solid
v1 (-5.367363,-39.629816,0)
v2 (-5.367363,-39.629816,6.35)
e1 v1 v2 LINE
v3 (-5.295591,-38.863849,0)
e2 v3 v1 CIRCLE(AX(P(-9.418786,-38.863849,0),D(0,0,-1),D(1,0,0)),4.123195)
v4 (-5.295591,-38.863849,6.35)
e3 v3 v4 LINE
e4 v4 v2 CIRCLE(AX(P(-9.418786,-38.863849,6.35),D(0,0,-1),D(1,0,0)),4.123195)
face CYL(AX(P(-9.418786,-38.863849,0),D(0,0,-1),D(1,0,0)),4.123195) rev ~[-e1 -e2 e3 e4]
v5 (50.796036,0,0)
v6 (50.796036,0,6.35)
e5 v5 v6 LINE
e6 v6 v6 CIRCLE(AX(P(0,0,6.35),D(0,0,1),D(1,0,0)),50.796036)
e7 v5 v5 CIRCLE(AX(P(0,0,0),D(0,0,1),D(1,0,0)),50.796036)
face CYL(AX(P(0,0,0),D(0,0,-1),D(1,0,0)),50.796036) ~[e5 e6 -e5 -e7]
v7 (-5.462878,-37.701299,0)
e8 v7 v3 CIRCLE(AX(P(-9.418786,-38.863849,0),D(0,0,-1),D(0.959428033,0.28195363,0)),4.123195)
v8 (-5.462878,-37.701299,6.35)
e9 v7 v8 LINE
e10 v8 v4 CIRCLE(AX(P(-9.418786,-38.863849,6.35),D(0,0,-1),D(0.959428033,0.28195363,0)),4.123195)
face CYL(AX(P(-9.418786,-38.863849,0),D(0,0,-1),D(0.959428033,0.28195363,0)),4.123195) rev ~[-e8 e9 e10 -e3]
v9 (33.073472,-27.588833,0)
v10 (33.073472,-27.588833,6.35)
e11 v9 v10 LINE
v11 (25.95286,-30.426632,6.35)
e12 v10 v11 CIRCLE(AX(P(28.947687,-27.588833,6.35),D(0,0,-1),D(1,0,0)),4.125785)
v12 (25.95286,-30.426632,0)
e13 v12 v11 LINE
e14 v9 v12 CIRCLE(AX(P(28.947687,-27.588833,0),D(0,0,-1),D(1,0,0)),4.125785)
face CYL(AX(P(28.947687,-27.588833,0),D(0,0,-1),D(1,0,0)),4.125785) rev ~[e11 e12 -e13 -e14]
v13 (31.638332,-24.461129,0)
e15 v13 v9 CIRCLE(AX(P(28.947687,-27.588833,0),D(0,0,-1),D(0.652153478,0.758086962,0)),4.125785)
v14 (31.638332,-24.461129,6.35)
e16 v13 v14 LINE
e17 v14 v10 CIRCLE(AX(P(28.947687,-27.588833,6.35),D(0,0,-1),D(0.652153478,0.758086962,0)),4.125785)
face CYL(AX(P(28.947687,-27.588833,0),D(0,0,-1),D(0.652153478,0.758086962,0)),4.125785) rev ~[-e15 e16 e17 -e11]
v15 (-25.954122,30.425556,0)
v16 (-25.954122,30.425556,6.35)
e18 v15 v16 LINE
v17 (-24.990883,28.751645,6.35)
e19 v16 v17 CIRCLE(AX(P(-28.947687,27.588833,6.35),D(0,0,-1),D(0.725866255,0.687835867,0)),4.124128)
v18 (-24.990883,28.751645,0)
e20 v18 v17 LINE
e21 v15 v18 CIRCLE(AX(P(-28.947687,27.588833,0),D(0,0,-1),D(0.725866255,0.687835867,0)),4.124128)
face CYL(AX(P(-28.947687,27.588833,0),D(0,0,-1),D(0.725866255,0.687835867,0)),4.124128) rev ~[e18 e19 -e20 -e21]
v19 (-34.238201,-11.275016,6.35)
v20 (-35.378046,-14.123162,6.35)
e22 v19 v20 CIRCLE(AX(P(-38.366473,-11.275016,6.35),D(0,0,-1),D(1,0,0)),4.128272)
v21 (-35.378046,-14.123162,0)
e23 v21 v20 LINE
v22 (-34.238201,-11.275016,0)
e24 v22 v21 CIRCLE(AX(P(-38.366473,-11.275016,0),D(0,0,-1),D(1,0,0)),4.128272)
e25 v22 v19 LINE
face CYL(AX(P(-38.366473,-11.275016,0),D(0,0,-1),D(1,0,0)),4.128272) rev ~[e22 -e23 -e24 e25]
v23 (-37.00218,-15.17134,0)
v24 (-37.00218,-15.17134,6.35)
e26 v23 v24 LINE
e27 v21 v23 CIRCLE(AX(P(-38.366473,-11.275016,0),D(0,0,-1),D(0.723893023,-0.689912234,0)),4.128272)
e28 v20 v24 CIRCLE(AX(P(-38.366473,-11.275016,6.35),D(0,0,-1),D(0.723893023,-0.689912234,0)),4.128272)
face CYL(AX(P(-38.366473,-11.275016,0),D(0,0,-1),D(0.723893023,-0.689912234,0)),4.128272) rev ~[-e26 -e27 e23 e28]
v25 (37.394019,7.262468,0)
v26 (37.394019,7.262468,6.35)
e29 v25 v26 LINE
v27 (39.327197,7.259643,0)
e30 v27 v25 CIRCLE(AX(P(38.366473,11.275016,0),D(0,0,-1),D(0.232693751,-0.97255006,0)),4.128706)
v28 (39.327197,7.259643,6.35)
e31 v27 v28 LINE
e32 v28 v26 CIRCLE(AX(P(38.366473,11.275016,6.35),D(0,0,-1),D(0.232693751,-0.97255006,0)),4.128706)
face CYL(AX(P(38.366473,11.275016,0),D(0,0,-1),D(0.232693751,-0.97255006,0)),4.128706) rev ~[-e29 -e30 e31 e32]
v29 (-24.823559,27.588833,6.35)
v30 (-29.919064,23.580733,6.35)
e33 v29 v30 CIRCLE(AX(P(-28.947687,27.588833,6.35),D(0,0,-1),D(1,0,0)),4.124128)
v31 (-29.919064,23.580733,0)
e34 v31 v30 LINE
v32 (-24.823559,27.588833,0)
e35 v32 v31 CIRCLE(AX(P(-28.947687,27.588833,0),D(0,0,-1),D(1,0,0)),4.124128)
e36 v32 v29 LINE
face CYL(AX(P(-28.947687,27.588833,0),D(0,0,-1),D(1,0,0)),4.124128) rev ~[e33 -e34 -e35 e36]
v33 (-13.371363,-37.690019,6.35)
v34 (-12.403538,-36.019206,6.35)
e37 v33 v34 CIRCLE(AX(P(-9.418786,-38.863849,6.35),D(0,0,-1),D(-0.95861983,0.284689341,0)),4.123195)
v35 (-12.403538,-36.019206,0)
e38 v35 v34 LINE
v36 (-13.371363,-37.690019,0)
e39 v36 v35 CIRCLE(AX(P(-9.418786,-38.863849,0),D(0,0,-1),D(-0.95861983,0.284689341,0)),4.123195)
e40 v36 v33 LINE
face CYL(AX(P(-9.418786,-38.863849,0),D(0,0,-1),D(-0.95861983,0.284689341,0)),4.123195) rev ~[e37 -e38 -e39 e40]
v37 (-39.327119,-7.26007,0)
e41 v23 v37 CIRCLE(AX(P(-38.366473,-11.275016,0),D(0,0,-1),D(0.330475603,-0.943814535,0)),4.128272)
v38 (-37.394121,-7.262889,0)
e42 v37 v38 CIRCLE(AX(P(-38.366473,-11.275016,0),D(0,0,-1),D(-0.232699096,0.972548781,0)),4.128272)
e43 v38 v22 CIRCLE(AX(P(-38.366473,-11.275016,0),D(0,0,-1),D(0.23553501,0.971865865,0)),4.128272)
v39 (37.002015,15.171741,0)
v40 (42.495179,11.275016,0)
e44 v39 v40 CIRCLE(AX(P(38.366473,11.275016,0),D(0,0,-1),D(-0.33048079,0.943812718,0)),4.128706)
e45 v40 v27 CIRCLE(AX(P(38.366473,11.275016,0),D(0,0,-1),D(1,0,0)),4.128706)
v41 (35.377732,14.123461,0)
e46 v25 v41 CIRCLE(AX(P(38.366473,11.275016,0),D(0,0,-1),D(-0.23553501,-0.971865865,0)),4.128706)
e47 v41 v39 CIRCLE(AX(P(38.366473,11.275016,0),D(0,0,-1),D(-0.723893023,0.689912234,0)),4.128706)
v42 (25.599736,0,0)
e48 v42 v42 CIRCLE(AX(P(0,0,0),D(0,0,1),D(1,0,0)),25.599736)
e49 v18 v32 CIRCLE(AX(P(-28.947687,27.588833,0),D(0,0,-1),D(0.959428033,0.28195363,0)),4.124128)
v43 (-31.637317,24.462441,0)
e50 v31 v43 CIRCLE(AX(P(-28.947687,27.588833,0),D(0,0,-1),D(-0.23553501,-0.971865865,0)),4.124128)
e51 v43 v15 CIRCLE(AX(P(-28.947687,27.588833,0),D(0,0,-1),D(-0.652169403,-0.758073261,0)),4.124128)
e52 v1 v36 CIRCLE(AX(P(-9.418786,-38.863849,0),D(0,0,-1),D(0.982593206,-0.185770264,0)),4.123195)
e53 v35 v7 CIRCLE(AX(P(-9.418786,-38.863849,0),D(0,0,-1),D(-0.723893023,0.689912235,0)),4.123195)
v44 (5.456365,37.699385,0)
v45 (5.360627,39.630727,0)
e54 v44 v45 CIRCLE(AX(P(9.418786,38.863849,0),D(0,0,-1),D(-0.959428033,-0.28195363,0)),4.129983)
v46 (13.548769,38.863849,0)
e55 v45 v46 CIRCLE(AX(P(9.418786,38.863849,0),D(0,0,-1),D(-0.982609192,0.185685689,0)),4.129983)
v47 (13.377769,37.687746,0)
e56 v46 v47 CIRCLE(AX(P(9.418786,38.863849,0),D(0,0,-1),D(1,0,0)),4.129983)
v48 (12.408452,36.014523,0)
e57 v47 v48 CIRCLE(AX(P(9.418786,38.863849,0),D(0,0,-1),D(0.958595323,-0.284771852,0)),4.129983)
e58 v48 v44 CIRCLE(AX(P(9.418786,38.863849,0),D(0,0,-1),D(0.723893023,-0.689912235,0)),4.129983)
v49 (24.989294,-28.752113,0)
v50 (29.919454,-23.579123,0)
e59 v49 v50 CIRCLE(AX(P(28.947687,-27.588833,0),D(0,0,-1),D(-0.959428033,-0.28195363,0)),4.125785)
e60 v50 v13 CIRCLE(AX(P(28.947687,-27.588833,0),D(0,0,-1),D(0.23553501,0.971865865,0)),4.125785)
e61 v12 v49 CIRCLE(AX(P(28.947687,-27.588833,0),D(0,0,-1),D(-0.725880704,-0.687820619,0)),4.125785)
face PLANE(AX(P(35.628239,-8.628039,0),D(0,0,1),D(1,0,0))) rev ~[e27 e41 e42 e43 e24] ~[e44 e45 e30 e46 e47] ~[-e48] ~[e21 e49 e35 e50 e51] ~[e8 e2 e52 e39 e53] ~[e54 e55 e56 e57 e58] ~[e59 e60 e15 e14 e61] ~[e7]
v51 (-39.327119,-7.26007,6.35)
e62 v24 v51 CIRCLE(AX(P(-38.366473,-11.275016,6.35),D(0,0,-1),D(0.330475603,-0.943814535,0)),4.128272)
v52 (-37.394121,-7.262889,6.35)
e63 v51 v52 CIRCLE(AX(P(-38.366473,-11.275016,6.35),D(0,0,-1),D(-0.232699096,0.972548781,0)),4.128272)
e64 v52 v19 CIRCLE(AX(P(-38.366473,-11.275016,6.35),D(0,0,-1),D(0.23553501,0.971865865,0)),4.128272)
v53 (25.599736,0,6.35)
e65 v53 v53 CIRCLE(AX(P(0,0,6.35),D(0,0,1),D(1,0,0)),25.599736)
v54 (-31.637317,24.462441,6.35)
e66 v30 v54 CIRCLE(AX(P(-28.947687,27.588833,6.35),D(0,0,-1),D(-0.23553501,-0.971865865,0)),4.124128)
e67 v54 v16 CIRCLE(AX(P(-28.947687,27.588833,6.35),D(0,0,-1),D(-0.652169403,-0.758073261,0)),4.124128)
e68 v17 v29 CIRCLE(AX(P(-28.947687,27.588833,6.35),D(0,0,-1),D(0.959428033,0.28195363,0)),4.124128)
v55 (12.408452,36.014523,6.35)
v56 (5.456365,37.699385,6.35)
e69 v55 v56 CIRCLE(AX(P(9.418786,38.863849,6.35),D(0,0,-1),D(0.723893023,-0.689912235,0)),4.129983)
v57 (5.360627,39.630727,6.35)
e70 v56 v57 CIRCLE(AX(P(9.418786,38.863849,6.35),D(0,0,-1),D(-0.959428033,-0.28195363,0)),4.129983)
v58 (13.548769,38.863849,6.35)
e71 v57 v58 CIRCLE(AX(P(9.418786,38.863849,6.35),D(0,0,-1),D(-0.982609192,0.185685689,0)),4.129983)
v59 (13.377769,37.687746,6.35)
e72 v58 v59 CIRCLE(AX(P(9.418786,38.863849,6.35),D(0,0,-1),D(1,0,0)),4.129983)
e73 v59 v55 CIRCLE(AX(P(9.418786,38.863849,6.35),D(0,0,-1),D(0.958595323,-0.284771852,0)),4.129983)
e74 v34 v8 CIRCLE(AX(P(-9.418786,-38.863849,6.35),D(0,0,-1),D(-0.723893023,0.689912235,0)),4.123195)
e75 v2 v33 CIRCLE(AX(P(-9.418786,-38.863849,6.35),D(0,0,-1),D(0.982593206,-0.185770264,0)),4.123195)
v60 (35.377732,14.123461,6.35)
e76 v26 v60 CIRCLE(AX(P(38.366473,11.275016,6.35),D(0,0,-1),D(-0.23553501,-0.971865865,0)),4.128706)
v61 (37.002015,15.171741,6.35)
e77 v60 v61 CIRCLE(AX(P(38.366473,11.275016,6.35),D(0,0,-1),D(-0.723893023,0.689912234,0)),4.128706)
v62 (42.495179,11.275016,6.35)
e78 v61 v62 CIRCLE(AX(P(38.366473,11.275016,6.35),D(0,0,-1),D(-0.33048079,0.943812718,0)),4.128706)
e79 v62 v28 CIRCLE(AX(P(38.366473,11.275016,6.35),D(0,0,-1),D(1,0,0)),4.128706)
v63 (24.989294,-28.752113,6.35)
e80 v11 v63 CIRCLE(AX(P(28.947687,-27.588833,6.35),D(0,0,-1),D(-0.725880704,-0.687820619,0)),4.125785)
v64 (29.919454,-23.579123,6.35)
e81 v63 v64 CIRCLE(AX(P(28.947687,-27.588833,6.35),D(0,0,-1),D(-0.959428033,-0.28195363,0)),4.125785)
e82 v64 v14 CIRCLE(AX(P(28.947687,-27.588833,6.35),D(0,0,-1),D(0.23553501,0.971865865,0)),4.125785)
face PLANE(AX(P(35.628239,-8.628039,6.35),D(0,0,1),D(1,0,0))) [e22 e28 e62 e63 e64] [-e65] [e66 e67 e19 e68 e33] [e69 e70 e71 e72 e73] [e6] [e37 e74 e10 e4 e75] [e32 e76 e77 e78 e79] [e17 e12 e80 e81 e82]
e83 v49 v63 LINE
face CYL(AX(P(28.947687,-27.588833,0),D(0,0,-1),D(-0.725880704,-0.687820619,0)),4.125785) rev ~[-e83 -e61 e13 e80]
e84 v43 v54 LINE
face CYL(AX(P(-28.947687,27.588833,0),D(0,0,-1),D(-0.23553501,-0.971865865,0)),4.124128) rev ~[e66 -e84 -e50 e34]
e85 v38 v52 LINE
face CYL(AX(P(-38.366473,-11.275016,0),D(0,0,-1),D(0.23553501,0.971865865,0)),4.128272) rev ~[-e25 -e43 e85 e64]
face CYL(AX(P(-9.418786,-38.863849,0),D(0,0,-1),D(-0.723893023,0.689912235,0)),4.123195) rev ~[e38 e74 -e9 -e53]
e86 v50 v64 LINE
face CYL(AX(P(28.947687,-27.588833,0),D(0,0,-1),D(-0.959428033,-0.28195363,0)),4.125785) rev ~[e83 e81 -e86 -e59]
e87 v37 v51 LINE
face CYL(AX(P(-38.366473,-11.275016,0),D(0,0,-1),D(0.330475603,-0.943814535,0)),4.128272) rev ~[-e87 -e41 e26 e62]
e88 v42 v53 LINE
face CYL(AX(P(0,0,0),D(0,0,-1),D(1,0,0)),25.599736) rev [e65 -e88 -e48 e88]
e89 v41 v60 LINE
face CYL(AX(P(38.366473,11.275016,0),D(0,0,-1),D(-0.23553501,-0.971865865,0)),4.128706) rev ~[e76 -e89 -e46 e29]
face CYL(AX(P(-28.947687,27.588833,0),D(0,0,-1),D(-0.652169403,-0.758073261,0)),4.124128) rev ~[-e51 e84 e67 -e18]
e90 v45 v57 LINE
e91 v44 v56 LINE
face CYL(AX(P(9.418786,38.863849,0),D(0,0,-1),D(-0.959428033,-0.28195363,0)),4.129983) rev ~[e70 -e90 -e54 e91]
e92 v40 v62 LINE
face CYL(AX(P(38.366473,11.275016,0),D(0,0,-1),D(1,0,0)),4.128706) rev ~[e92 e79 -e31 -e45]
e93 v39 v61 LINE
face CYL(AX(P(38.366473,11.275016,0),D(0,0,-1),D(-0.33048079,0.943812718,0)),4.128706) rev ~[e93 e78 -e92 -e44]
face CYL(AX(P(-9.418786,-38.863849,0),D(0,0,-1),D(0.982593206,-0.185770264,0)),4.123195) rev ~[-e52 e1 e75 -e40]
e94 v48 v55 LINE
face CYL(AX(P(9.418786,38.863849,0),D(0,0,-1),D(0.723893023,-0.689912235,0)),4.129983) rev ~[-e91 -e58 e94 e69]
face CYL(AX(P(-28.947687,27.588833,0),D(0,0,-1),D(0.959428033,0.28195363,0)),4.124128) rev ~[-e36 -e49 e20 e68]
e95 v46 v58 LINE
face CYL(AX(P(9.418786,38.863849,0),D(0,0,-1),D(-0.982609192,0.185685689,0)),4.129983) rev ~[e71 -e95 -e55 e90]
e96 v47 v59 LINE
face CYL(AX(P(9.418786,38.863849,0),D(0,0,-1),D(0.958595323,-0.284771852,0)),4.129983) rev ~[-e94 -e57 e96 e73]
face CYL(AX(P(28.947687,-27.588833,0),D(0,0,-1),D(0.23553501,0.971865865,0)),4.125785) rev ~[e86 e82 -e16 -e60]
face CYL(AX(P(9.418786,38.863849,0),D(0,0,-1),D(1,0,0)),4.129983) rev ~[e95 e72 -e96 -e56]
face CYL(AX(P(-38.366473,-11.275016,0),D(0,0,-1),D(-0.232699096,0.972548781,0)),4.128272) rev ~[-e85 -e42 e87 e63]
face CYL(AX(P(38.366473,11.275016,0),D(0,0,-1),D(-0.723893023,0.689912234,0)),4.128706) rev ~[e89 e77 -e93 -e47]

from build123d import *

# Parameters (mm, degrees)
F0_R     = 50.796035682
F1_DEPTH = 6.35
F0_R_2   = 25.5997355282
F2_DEPTH = 6.35


with BuildPart() as f1:
    # F0 (on Top) → F1 (new body)
    with BuildSketch(Plane.XY):
        Circle(F0_R)
        with BuildLine():
            ThreePointArc((39.3271974597, 7.2596428653), (39.8251792413, 3.6449928619), (39.9916350574, 0))
            ThreePointArc((39.9916350574, 0), (37.8457361774, -12.9240522963), (31.638331797, -24.4611290759))
            ThreePointArc((31.638331797, -24.4611290759), (32.6975616463, -25.8682109338), (33.0734716269, -27.5888325992))
            ThreePointArc((33.0734716269, -27.5888325992), (30.4751171589, -31.421463006), (25.9528595707, -30.4266323255))
            ThreePointArc((25.9528595707, -30.4266323255), (11.2745427029, -38.3694613124), (-5.3673629967, -39.6298156572))
            ThreePointArc((-5.3673629967, -39.6298156572), (-10.3899431598, -42.8710411012), (-13.3713628706, -37.6900189645))
            ThreePointArc((-13.3713628706, -37.6900189645), (-27.5888779577, -28.9514194402), (-37.0021800615, -15.1713396))
            ThreePointArc((-37.0021800615, -15.1713396), (-42.3272537393, -12.438997445), (-39.3271186708, -7.2600696702))
            ThreePointArc((-39.3271186708, -7.2600696702), (-38.8660161768, 9.4214468691), (-31.637317072, 24.4624414777))
            ThreePointArc((-31.637317072, 24.4624414777), (-31.9331144569, 30.4341189249), (-25.9541217074, 30.4255557215))
            ThreePointArc((-25.9541217074, 30.4255557215), (-11.2785991848, 38.3682691165), (5.3606272578, 39.6307273459))
            ThreePointArc((5.3606272578, 39.6307273459), (9.8039037737, 42.9758363595), (13.548769251, 38.8638486327))
            ThreePointArc((13.548769251, 38.8638486327), (13.5057955215, 38.2696140057), (13.3777686423, 37.6877457633))
            ThreePointArc((13.3777686423, 37.6877457633), (27.5911811268, 28.9492244903), (37.0020154097, 15.1717411718))
            ThreePointArc((37.0020154097, 15.1717411718), (40.7552771421, 14.6424823027), (42.495179297, 11.2750160335))
            ThreePointArc((42.495179297, 11.2750160335), (41.6078280146, 8.7177063827), (39.3271974597, 7.2596428653))
        make_face(mode=Mode.SUBTRACT)
    extrude(amount=F1_DEPTH)



with BuildPart() as f1b:
    # F0 (on Top) → F1, piece 2 (new body)
    with BuildSketch(Plane.XY):
        with BuildLine():
            Line((29.9194537324, -23.5791233665), (37.3940186124, 7.2624677043))
            ThreePointArc((37.3940186124, 7.2624677043), (34.4052772179, 10.1109124169), (35.3777320032, 14.1234607462))
            Line((35.3777320032, 14.1234607462), (12.4084521668, 36.0145229256))
            ThreePointArc((12.4084521668, 36.0145229256), (8.4460308303, 34.8500592639), (5.4563650491, 37.6993849709))
            Line((5.4563650491, 37.6993849709), (-24.9908830503, 28.7516454448))
            ThreePointArc((-24.9908830503, 28.7516454448), (-24.8656043881, 28.1762274896), (-24.8235590671, 27.5888325992))
            ThreePointArc((-24.8235590671, 27.5888325992), (-26.3979468028, 24.3473427918), (-29.9190635285, 23.5807334278))
            Line((-29.9190635285, 23.5807334278), (-37.3941206986, -7.2628889331))
            ThreePointArc((-37.3941206986, -7.2628889331), (-35.1217260633, -8.7227134695), (-34.2382009209, -11.2750160335))
            ThreePointArc((-34.2382009209, -11.2750160335), (-34.5337408719, -12.8088983718), (-35.3780457549, -14.1231617225))
            Line((-35.3780457549, -14.1231617225), (-12.4035384742, -36.019205961))
            ThreePointArc((-12.4035384742, -36.019205961), (-8.4476296116, -34.8566561642), (-5.4628775231, -37.7012988359))
            Line((-5.4628775231, -37.7012988359), (24.9892935944, -28.752112549))
            ThreePointArc((24.9892935944, -28.752112549), (25.9610603149, -24.7424033164), (29.9194537324, -23.5791233665))
        make_face()
        Circle(F0_R_2, mode=Mode.SUBTRACT)
    extrude(amount=F1_DEPTH)


with BuildPart() as f1_1:
    add(f1.part)

    add(f1b.part)  # F2 merges F1b
    # F0 (on Top) → F2 (join)
    with BuildSketch(Plane.XY):
        with BuildLine():
            ThreePointArc((31.638331797, -24.4611290759), (37.8457361774, -12.9240522963), (39.9916350574, 0))
            ThreePointArc((39.9916350574, 0), (39.8251792413, 3.6449928619), (39.3271974597, 7.2596428653))
            ThreePointArc((39.3271974597, 7.2596428653), (38.3604403722, 7.146314542), (37.3940186124, 7.2624677043))
            Line((37.3940186124, 7.2624677043), (29.9194537324, -23.5791233665))
            ThreePointArc((29.9194537324, -23.5791233665), (30.8312469464, -23.9180968879), (31.638331797, -24.4611290759))
        make_face()
        with BuildLine():
            ThreePointArc((35.3777320032, 14.1234607462), (36.1276546961, 14.7440077063), (37.0020154097, 15.1717411718))
            ThreePointArc((37.0020154097, 15.1717411718), (27.5911811268, 28.9492244903), (13.3777686423, 37.6877457633))
            ThreePointArc((13.3777686423, 37.6877457633), (12.9924184393, 36.7936041028), (12.4084521668, 36.0145229256))
            Line((12.4084521668, 36.0145229256), (35.3777320032, 14.1234607462))
        make_face()
        with BuildLine():
            ThreePointArc((-5.3673629967, -39.6298156572), (11.2745427029, -38.3694613124), (25.9528595707, -30.4266323255))
            ThreePointArc((25.9528595707, -30.4266323255), (25.3716802728, -29.6465678813), (24.9892935944, -28.752112549))
            Line((24.9892935944, -28.752112549), (-5.4628775231, -37.7012988359))
            ThreePointArc((-5.4628775231, -37.7012988359), (-5.3376272012, -38.2765866213), (-5.2955913916, -38.8638486327))
            ThreePointArc((-5.2955913916, -38.8638486327), (-5.3135735047, -39.2485097322), (-5.3673629967, -39.6298156572))
        make_face()
        with BuildLine():
            ThreePointArc((5.4563650491, 37.6993849709), (5.2938683757, 38.6593739913), (5.3606272578, 39.6307273459))
            ThreePointArc((5.3606272578, 39.6307273459), (-11.2785991848, 38.3682691165), (-25.9541217074, 30.4255557215))
            ThreePointArc((-25.9541217074, 30.4255557215), (-25.3731377903, 29.6457791632), (-24.9908830503, 28.7516454448))
            Line((-24.9908830503, 28.7516454448), (5.4563650491, 37.6993849709))
        make_face()
        with BuildLine():
            ThreePointArc((-37.0021800615, -15.1713396), (-27.5888779577, -28.9514194402), (-13.3713628706, -37.6900189645))
            ThreePointArc((-13.3713628706, -37.6900189645), (-12.9866339101, -36.7971602183), (-12.4035384742, -36.019205961))
            Line((-12.4035384742, -36.019205961), (-35.3780457549, -14.1231617225))
            ThreePointArc((-35.3780457549, -14.1231617225), (-36.1278992542, -14.7436496905), (-37.0021800615, -15.1713396))
        make_face()
        with BuildLine():
            ThreePointArc((-29.9190635285, 23.5807334278), (-30.8305291615, 23.9195906141), (-31.637317072, 24.4624414777))
            ThreePointArc((-31.637317072, 24.4624414777), (-38.8660161768, 9.4214468691), (-39.3271186708, -7.2600696702))
            ThreePointArc((-39.3271186708, -7.2600696702), (-38.3604523499, -7.1467479477), (-37.3941206986, -7.2628889331))
            Line((-37.3941206986, -7.2628889331), (-29.9190635285, 23.5807334278))
        make_face()
    extrude(amount=F2_DEPTH)


solid = f1_1.part
